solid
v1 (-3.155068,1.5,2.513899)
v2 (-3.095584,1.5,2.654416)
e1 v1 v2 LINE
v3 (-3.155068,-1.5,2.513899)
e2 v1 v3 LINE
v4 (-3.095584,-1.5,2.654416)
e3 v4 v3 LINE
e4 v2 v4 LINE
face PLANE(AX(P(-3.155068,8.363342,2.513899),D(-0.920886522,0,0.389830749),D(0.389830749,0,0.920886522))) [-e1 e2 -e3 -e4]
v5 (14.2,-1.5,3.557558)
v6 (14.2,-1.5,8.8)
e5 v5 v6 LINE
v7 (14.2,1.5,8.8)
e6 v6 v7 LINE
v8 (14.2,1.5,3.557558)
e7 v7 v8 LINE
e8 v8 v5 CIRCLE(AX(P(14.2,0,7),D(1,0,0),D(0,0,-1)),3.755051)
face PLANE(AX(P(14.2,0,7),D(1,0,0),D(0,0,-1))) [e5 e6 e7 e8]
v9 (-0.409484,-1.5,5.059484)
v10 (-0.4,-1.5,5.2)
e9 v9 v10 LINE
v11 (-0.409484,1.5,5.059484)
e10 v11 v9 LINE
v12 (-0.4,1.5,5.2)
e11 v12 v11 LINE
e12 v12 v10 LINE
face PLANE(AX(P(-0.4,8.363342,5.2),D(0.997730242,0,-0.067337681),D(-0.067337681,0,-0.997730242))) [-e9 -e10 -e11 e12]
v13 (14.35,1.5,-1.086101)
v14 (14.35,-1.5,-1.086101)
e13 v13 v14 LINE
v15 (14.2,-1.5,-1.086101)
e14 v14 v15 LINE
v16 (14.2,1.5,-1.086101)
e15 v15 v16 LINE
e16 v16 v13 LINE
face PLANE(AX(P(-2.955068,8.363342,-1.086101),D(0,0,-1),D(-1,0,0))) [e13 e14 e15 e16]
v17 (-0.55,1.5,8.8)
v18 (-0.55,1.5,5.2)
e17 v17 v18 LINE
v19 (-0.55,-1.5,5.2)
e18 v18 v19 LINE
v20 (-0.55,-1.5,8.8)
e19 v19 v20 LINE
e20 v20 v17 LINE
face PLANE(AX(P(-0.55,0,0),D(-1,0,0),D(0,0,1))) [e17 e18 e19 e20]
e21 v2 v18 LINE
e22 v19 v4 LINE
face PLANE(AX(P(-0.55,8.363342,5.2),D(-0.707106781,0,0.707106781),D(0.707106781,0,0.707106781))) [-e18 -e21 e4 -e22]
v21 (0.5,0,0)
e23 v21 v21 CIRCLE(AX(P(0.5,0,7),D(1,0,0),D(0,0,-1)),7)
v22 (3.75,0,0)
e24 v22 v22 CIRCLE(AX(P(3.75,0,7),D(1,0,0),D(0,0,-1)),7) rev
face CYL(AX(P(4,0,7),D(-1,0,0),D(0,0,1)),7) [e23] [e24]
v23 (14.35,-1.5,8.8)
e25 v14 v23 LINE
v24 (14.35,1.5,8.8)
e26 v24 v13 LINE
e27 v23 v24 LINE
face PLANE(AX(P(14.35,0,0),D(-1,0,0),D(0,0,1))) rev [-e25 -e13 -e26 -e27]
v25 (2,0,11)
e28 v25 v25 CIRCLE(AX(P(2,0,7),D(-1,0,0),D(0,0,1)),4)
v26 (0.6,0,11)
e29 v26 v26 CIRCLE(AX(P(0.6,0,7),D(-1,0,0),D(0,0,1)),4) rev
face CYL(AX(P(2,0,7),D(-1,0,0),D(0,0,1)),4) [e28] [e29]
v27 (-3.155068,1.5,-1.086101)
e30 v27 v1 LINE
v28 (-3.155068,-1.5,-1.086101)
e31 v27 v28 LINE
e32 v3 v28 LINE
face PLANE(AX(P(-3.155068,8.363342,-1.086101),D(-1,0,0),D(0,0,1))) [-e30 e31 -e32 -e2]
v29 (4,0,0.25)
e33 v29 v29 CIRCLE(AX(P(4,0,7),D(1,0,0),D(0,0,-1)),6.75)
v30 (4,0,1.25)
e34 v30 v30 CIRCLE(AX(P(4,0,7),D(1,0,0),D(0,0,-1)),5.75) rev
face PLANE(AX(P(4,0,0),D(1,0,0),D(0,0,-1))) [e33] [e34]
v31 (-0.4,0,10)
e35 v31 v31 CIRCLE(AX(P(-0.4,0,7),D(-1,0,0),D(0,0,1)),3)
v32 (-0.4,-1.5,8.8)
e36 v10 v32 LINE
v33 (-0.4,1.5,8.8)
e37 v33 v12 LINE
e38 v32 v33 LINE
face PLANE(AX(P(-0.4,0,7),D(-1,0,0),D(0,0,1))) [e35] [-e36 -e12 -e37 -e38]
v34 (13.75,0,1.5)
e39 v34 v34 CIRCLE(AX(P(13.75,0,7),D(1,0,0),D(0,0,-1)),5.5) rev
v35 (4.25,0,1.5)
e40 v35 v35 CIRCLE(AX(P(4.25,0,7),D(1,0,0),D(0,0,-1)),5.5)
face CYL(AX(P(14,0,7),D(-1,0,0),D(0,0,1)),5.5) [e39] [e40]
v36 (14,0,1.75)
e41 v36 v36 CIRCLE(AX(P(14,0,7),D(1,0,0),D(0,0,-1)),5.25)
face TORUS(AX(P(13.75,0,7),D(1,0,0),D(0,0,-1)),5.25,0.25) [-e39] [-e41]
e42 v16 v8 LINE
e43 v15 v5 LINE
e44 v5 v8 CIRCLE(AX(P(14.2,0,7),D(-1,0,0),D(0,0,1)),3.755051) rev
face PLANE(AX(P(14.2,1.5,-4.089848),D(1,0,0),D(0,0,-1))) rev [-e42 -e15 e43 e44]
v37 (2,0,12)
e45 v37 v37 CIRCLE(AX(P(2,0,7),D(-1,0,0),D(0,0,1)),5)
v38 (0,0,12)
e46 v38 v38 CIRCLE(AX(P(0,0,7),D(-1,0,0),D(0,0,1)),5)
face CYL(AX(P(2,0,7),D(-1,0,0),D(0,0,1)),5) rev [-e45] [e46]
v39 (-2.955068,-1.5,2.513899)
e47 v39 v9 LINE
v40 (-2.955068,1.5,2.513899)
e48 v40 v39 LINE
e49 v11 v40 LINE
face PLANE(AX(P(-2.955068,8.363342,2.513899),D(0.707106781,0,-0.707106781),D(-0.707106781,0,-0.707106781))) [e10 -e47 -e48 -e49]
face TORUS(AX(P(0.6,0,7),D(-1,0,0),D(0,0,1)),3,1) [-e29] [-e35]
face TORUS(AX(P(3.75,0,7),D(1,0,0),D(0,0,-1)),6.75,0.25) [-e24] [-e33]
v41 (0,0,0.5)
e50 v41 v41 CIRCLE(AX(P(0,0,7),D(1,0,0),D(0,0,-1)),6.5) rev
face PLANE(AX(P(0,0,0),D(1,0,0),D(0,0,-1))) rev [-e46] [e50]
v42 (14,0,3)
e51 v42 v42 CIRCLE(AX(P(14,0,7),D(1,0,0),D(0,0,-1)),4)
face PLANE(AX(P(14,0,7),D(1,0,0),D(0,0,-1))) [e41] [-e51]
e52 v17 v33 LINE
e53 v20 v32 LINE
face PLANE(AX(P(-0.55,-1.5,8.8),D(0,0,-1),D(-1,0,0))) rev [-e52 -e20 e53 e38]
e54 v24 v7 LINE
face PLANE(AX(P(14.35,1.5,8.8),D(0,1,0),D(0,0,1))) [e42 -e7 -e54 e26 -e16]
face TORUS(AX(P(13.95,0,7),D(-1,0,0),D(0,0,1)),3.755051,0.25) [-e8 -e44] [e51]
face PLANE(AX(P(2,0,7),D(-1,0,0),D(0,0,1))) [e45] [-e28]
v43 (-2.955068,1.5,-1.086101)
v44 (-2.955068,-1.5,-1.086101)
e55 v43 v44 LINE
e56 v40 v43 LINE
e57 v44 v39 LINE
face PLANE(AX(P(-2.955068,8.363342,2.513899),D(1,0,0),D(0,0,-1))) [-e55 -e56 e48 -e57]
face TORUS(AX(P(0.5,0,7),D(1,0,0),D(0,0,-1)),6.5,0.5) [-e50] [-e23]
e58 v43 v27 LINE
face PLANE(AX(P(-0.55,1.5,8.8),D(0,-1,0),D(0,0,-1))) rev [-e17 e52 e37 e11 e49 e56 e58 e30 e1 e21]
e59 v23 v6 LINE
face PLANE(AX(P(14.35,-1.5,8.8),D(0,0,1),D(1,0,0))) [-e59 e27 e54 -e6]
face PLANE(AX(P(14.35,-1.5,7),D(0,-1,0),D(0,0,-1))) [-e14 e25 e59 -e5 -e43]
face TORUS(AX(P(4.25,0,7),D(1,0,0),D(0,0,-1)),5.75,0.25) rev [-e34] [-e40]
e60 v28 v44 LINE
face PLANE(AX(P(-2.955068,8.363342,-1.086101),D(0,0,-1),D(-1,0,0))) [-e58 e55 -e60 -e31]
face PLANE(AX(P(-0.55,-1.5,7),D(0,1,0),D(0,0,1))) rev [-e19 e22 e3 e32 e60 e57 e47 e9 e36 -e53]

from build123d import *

# Parameters (mm, degrees)
SKETCH1_R           = 7
BOSS_EXTRUDE1_DEPTH = 4
SKETCH2_R           = 5.5
BOSS_EXTRUDE2_DEPTH = 10
SKETCH3_R           = 4
BOSS_EXTRUDE3_DEPTH = 0.2
SKETCH4_R           = 5
SKETCH4_R_2         = 4
CUT_EXTRUDE3_DEPTH  = 2
BOSS_EXTRUDE4_START = 0.4
SKETCH5_R           = 4
BOSS_EXTRUDE4_DEPTH = 0.4
FILLET1_R           = 0.25
FILLET2_R           = 0.25
FILLET3_R           = 0.5
FILLET4_R           = 1
FILLET5_R           = 0.25
BOSS_EXTRUDE5_DEPTH = 0.15
BOSS_EXTRUDE6_DEPTH = 3
BOSS_EXTRUDE7_DEPTH = 0.15
SKETCH11_W          = 0.15
SKETCH11_H          = 3
BOSS_EXTRUDE8_DEPTH = 6.286100837


with BuildPart() as part:
    # Sketch1 → Boss-Extrude1 (new body)
    with BuildSketch(Plane(origin=(0, 0, 0), x_dir=(0, 0, -1), z_dir=(1, 0, 0))):
        with Locations((-7, 0)):
            Circle(SKETCH1_R)
    extrude(amount=BOSS_EXTRUDE1_DEPTH)

    # Sketch2 → Boss-Extrude2 (add)
    with BuildSketch(Plane(origin=(4, 0, 0), x_dir=(0, 0, -1), z_dir=(1, 0, 0))):
        with Locations((-7, 0)):
            Circle(SKETCH2_R)
    extrude(amount=BOSS_EXTRUDE2_DEPTH)

    # Sketch3 → Boss-Extrude3 (add)
    with BuildSketch(Plane(origin=(14, 0, 0), x_dir=(0, 0, -1), z_dir=(1, 0, 0))):
        with Locations((-7, 0)):
            Circle(SKETCH3_R)
    extrude(amount=BOSS_EXTRUDE3_DEPTH)

    # Sketch4 → Cut-Extrude3 (cut)
    with BuildSketch(Plane.ZY):
        with Locations((7, 0)):
            Circle(SKETCH4_R)
        with Locations(Location((7, 0, 0), (0, 0, 180))):
            Circle(SKETCH4_R_2, mode=Mode.SUBTRACT)
    extrude(amount=-CUT_EXTRUDE3_DEPTH, mode=Mode.SUBTRACT)

    # Sketch5 → Boss-Extrude4 (add)
    with BuildSketch(Plane.ZY.offset(BOSS_EXTRUDE4_START)):
        with Locations(Location((7, 0, 0), (0, 0, 180))):
            Circle(SKETCH5_R)
    extrude(amount=-BOSS_EXTRUDE4_DEPTH)

    # Fillet1
    fillet1_edges = [part.edges().sort_by_distance(p)[0] for p in [
        (4, 0, 12.5),
    ]]
    fillet(fillet1_edges, radius=FILLET1_R)

    # Fillet2
    fillet2_edges = [part.edges().sort_by_distance(p)[0] for p in [
        (4, 0, 14),
    ]]
    fillet(fillet2_edges, radius=FILLET2_R)

    # Fillet3
    fillet3_edges = [part.edges().sort_by_distance(p)[0] for p in [
        (0, 0, 14),
    ]]
    fillet(fillet3_edges, radius=FILLET3_R)

    # Fillet4
    fillet4_edges = [part.edges().sort_by_distance(p)[0] for p in [
        (-0.4, 0, 11),
    ]]
    fillet(fillet4_edges, radius=FILLET4_R)

    # Fillet5
    # the kernel refuses this fillet: 0.25 mm, written as the material it takes off along each edge
    with BuildSketch(Plane(origin=(14.2, 0, 7), x_dir=(0, 0, -1), z_dir=(0, -1, 0))) as fillet5_piece_1:
        with BuildLine():
            CenterArc((3.755051026, -0.25), FILLET5_R, 11.536959033, 78.463040967)
            Line((3.755051026, 0), (3.755051026, 0.005))
            Line((3.755051026, 0.005), (4, 0.005))
            Line((4, 0.005), (4.005, 0))
            ThreePointArc((4.005, 0), (4.005, -0.1), (4.004898979, -0.199))
            Line((4.004898979, -0.199), (4, -0.2))
        make_face()
    revolve(axis=Axis((14.2, 0, 7), (1, 0, 0)), mode=Mode.SUBTRACT)
    with BuildSketch(Plane(origin=(14, 0, 7), x_dir=(0, 0, -1), z_dir=(0, -1, 0))) as fillet5_piece_2:
        with BuildLine():
            CenterArc((5.5 - FILLET5_R, -FILLET5_R), FILLET5_R, 0, 90)
            Line((5.5 - FILLET5_R, 0), (5.5 - FILLET5_R, FILLET5_R * 0.02))
            Line((5.5 - FILLET5_R, FILLET5_R * 0.02), (5.5 + FILLET5_R * 0.02, FILLET5_R * 0.02))
            Line((5.5 + FILLET5_R * 0.02, FILLET5_R * 0.02), (5.5 + FILLET5_R * 0.02, -FILLET5_R))
            Line((5.5 + FILLET5_R * 0.02, -FILLET5_R), (5.5, -FILLET5_R))
        make_face()
    revolve(axis=Axis((14, 0, 7), (1, 0, 0)), mode=Mode.SUBTRACT)

    # Sketch6 → Boss-Extrude5 (add)
    with BuildSketch(Plane.ZY.offset(0.4)):
        Polygon((7, -1.5), (8.8, -1.5), (8.8, 1.5), (5.2, 1.5), (5.2, -1.5), align=None)
    extrude(amount=BOSS_EXTRUDE5_DEPTH)

    # Sketch7 → Boss-Extrude6 (add)
    with BuildSketch(Plane.XZ.offset(1.5)):
        Polygon((-0.55, 5.2), (-3.095584412, 2.654415588), (-3.155067988, 2.513899163), (-3.155067988, -1.086100837), (-2.955067988, -1.086100837), (-2.955067988, 2.513899163), (-0.409483576, 5.059483576), (-0.4, 5.2), align=None)
    extrude(amount=-BOSS_EXTRUDE6_DEPTH)

    # Sketch8 → Boss-Extrude7 (add)
    with BuildSketch(Plane(origin=(14.2, 0, 0), x_dir=(0, 0, -1), z_dir=(1, 0, 0))):
        Polygon((-7, -1.5), (-8.8, -1.5), (-8.8, 1.5), (-5.2, 1.5), (-5.2, -1.5), align=None)
    extrude(amount=BOSS_EXTRUDE7_DEPTH)

    # Sketch11 → Boss-Extrude8 (add)
    with BuildSketch(Plane(origin=(0, 0, 5.2), x_dir=(-1, 0, 0), z_dir=(0, 0, -1))):
        with Locations((-14.275, 0)):
            Rectangle(SKETCH11_W, SKETCH11_H)
    extrude(amount=BOSS_EXTRUDE8_DEPTH)


solid = part.part
